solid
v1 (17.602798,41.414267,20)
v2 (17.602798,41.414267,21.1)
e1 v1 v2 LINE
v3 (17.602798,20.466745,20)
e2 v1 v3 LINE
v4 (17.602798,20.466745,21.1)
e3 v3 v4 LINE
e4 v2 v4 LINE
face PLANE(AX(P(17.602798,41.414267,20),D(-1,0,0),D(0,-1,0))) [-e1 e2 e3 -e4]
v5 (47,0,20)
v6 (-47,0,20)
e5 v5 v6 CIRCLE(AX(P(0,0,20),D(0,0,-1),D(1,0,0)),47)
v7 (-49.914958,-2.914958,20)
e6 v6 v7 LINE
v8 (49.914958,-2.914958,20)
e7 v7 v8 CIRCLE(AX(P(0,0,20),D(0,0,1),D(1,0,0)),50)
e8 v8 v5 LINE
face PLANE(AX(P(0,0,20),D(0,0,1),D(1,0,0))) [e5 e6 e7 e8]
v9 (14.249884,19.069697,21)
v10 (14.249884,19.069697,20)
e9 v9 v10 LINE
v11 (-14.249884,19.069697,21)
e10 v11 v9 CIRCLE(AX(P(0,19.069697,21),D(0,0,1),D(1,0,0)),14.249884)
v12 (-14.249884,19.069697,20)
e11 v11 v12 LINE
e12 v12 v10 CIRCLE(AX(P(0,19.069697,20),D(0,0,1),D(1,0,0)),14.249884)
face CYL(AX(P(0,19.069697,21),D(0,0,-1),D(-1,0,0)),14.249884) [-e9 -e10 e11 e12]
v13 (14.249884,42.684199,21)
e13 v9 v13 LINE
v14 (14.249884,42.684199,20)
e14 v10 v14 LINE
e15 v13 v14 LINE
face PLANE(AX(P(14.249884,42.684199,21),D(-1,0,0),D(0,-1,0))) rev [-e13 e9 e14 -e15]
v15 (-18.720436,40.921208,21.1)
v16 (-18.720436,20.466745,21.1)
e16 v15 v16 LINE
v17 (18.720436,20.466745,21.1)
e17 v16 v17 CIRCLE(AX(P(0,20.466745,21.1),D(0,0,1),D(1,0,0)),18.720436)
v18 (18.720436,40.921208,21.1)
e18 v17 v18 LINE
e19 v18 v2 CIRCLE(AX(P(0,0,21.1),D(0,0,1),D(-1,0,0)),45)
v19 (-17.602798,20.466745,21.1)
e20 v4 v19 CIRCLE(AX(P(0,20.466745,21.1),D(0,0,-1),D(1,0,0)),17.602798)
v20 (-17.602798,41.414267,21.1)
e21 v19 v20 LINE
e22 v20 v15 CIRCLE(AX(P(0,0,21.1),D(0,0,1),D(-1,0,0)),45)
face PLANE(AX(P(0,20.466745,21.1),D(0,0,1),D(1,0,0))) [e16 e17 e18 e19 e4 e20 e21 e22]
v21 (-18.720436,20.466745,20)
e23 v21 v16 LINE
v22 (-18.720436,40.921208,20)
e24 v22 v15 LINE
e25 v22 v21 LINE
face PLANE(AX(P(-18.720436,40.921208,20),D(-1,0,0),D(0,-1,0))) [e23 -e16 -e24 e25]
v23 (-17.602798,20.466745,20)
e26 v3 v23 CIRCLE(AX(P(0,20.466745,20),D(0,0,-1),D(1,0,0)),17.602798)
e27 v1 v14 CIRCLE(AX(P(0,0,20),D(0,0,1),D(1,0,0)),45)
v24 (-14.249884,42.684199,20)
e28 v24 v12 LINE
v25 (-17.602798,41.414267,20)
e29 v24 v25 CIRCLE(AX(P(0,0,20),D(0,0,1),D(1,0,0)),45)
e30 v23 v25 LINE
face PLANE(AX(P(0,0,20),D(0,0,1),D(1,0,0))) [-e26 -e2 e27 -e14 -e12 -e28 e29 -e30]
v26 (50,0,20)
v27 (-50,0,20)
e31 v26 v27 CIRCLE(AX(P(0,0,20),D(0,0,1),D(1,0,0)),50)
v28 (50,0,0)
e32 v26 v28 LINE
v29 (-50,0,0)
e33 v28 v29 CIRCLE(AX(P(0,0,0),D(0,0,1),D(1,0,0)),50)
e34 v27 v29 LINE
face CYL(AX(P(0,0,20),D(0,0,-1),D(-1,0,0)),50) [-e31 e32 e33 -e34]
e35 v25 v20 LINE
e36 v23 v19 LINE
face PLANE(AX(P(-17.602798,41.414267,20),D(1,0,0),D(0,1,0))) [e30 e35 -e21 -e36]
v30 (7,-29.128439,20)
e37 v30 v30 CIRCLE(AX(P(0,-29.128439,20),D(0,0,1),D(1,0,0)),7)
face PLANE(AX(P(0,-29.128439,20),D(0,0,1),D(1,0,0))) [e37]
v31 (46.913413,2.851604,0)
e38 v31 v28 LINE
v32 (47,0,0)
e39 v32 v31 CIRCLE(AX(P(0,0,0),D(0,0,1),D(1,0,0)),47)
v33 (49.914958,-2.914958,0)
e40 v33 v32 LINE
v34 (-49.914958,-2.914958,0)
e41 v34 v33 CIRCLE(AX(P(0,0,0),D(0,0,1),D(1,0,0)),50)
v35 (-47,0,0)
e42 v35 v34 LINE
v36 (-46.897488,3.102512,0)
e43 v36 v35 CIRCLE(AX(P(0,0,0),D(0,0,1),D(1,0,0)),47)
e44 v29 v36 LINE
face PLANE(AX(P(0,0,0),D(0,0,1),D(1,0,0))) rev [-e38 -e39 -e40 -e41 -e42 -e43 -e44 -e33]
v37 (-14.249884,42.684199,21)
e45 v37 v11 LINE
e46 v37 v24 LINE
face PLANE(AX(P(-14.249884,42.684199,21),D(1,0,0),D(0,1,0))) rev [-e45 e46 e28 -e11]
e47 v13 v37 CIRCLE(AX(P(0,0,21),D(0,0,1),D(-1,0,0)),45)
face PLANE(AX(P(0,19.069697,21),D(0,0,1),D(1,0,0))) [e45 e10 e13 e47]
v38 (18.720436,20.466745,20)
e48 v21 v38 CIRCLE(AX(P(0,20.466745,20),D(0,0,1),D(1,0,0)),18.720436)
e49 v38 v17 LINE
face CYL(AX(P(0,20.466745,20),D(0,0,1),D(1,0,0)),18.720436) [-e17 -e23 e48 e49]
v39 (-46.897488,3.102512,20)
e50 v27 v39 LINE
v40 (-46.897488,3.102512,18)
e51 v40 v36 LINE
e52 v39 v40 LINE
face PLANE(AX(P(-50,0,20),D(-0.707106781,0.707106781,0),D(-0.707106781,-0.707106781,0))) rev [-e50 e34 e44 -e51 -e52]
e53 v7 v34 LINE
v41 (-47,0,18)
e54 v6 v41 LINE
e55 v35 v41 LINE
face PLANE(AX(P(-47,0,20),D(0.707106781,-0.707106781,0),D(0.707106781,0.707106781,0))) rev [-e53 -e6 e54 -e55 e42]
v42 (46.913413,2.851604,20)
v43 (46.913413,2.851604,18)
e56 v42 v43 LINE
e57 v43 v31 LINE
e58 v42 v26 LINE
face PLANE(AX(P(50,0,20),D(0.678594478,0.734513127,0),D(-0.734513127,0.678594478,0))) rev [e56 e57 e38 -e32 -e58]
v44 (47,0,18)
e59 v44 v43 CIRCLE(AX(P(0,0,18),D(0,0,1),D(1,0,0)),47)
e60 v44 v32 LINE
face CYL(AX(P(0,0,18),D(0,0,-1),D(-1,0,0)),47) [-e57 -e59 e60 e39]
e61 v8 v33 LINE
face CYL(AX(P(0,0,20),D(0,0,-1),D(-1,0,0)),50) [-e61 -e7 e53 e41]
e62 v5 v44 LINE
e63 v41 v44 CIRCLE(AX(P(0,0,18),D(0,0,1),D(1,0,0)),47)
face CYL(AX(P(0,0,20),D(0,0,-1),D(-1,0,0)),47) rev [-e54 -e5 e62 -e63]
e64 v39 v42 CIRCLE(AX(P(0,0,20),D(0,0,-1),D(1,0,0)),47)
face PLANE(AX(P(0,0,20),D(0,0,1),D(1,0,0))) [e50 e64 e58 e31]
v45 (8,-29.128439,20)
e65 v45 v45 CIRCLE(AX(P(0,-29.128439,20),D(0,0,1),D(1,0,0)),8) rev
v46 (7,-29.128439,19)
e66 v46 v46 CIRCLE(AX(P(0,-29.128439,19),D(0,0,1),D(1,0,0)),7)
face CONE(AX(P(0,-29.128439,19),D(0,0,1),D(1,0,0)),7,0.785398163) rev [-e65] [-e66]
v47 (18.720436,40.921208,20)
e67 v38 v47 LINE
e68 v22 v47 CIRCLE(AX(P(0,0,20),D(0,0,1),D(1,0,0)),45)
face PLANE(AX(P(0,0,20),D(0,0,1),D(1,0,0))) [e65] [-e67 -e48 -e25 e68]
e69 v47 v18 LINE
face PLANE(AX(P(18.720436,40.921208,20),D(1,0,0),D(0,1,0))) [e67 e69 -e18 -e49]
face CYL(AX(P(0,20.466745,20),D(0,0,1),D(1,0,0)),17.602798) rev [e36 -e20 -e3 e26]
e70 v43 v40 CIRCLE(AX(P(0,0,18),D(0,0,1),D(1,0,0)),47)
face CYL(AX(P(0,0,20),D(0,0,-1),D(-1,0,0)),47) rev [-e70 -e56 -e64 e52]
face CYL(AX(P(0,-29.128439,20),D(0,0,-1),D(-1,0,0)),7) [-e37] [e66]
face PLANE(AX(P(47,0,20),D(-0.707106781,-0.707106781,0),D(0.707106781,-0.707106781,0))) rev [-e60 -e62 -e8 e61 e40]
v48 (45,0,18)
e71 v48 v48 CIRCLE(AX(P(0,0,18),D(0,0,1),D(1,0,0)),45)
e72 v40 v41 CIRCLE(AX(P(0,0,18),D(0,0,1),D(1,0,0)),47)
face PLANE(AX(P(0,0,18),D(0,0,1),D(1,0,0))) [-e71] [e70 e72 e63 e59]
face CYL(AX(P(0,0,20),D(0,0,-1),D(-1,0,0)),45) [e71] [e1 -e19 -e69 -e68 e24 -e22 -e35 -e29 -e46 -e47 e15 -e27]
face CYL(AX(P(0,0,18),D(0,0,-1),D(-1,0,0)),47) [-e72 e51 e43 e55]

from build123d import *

# Parameters (mm, degrees)
BOSS_EXTRUDE1_DEPTH      = 20
BOSS_EXTRUDE1_2_DEPTH    = 20
SKETCH2_R                = 47
BOSS_EXTRUDE2_DEPTH      = 18
SKETCH3_R                = 45
BOSS_EXTRUDE3_DEPTH      = 2
SKETCH4_R                = 7
CUT_EXTRUDE1_DEPTH       = 1
CHAMFER1_SIZE            = 1
BOSS_EXTRUDE4_START      = 1
SKETCH5_R                = 7
BOSS_EXTRUDE4_DEPTH      = 1
BOSS_EXTRUDE5_DEPTH      = 1
BOSS_EXTRUDE6_DEPTH      = 0.1
BOSS_EXTRUDE6_DEPTH_BACK = 1


with BuildPart() as part:
    # Sketch1 → Boss-Extrude1 (new body)
    with BuildSketch(Plane.XY):
        with BuildLine():
            Line((47, 0), (49.914957884, -2.914957884))
            ThreePointArc((49.914957884, -2.914957884), (0, -50), (-49.914957884, -2.914957884))
            Line((-49.914957884, -2.914957884), (-47, 0))
            ThreePointArc((-47, 0), (0, -47), (47, 0))
        make_face()
    extrude(amount=BOSS_EXTRUDE1_DEPTH)



with BuildPart() as body_2:
    # Sketch1 → Boss-Extrude1 2 (new body)
    with BuildSketch(Plane.XY):
        with BuildLine():
            Line((50, 0), (46.913413371, 2.851604096))
            ThreePointArc((46.913413371, 2.851604096), (0.125706164, 46.999831893), (-46.89748844, 3.10251156))
            Line((-46.89748844, 3.10251156), (-50, 0))
            ThreePointArc((-50, 0), (0, 50), (50, 0))
        make_face()
    extrude(amount=BOSS_EXTRUDE1_2_DEPTH)


with BuildPart() as part_1:
    add(part.part)

    add(body_2.part)  # Boss-Extrude2 merges body 2
    # Sketch2 → Boss-Extrude2 (add)
    with BuildSketch(Plane.XY):
        Circle(SKETCH2_R)
    extrude(amount=BOSS_EXTRUDE2_DEPTH)

    # Sketch3 → Boss-Extrude3 (add)
    with BuildSketch(Plane.XY.offset(18)):
        Circle(SKETCH3_R)
    extrude(amount=BOSS_EXTRUDE3_DEPTH)

    # Sketch4 → Cut-Extrude1 (cut)
    with BuildSketch(Plane.XY.offset(20)):
        with Locations((0, -29.128438865)):
            Circle(SKETCH4_R)
    extrude(amount=-CUT_EXTRUDE1_DEPTH, mode=Mode.SUBTRACT)

    # Chamfer1
    chamfer1_edges = [part_1.edges().sort_by_distance(p)[0] for p in [
        (-7, -29.128438865, 20),
    ]]
    chamfer(chamfer1_edges, length=CHAMFER1_SIZE - 0.0001)  # a hair under: the kernel refuses the full size

    # Sketch5 → Boss-Extrude4 (add)
    with BuildSketch(Plane.XY.offset(19).offset(BOSS_EXTRUDE4_START)):
        with Locations((0, -29.128438865)):
            Circle(SKETCH5_R)
    extrude(amount=-BOSS_EXTRUDE4_DEPTH)

    # Sketch7 → Boss-Extrude5 (add)
    with BuildSketch(Plane.XY.offset(20)):
        with BuildLine():
            Line((14.249883761, 42.684198631), (14.249883761, 19.069697386))
            ThreePointArc((14.249883761, 19.069697386), (0, 4.819813625), (-14.249883761, 19.069697386))
            Line((-14.249883761, 19.069697386), (-14.249883761, 42.684198631))
            ThreePointArc((-14.249883761, 42.684198631), (0, 45), (14.249883761, 42.684198631))
        make_face()
    extrude(amount=BOSS_EXTRUDE5_DEPTH)

    # Sketch8 → Boss-Extrude6 (add, two sides: drawn at the far end of the back side and taken through both)
    with BuildSketch(Plane.XY.offset(21).offset(-BOSS_EXTRUDE6_DEPTH_BACK)):
        with BuildLine():
            Line((18.72043553, 40.921208359), (18.72043553, 20.466744814))
            ThreePointArc((18.72043553, 20.466744814), (0, 1.746309284), (-18.72043553, 20.466744814))
            Line((-18.72043553, 20.466744814), (-18.72043553, 40.921208359))
            ThreePointArc((-18.72043553, 40.921208359), (-18.1632897, 41.1715303), (-17.602797587, 41.414267072))
            Line((-17.602797587, 41.414267072), (-17.602797587, 20.466744814))
            ThreePointArc((-17.602797587, 20.466744814), (0, 2.863947227), (17.602797587, 20.466744814))
            Line((17.602797587, 20.466744814), (17.602797587, 41.414267072))
            ThreePointArc((17.602797587, 41.414267072), (18.1632897, 41.1715303), (18.72043553, 40.921208359))
        make_face()
    extrude(amount=BOSS_EXTRUDE6_DEPTH + BOSS_EXTRUDE6_DEPTH_BACK)


solid = part_1.part
